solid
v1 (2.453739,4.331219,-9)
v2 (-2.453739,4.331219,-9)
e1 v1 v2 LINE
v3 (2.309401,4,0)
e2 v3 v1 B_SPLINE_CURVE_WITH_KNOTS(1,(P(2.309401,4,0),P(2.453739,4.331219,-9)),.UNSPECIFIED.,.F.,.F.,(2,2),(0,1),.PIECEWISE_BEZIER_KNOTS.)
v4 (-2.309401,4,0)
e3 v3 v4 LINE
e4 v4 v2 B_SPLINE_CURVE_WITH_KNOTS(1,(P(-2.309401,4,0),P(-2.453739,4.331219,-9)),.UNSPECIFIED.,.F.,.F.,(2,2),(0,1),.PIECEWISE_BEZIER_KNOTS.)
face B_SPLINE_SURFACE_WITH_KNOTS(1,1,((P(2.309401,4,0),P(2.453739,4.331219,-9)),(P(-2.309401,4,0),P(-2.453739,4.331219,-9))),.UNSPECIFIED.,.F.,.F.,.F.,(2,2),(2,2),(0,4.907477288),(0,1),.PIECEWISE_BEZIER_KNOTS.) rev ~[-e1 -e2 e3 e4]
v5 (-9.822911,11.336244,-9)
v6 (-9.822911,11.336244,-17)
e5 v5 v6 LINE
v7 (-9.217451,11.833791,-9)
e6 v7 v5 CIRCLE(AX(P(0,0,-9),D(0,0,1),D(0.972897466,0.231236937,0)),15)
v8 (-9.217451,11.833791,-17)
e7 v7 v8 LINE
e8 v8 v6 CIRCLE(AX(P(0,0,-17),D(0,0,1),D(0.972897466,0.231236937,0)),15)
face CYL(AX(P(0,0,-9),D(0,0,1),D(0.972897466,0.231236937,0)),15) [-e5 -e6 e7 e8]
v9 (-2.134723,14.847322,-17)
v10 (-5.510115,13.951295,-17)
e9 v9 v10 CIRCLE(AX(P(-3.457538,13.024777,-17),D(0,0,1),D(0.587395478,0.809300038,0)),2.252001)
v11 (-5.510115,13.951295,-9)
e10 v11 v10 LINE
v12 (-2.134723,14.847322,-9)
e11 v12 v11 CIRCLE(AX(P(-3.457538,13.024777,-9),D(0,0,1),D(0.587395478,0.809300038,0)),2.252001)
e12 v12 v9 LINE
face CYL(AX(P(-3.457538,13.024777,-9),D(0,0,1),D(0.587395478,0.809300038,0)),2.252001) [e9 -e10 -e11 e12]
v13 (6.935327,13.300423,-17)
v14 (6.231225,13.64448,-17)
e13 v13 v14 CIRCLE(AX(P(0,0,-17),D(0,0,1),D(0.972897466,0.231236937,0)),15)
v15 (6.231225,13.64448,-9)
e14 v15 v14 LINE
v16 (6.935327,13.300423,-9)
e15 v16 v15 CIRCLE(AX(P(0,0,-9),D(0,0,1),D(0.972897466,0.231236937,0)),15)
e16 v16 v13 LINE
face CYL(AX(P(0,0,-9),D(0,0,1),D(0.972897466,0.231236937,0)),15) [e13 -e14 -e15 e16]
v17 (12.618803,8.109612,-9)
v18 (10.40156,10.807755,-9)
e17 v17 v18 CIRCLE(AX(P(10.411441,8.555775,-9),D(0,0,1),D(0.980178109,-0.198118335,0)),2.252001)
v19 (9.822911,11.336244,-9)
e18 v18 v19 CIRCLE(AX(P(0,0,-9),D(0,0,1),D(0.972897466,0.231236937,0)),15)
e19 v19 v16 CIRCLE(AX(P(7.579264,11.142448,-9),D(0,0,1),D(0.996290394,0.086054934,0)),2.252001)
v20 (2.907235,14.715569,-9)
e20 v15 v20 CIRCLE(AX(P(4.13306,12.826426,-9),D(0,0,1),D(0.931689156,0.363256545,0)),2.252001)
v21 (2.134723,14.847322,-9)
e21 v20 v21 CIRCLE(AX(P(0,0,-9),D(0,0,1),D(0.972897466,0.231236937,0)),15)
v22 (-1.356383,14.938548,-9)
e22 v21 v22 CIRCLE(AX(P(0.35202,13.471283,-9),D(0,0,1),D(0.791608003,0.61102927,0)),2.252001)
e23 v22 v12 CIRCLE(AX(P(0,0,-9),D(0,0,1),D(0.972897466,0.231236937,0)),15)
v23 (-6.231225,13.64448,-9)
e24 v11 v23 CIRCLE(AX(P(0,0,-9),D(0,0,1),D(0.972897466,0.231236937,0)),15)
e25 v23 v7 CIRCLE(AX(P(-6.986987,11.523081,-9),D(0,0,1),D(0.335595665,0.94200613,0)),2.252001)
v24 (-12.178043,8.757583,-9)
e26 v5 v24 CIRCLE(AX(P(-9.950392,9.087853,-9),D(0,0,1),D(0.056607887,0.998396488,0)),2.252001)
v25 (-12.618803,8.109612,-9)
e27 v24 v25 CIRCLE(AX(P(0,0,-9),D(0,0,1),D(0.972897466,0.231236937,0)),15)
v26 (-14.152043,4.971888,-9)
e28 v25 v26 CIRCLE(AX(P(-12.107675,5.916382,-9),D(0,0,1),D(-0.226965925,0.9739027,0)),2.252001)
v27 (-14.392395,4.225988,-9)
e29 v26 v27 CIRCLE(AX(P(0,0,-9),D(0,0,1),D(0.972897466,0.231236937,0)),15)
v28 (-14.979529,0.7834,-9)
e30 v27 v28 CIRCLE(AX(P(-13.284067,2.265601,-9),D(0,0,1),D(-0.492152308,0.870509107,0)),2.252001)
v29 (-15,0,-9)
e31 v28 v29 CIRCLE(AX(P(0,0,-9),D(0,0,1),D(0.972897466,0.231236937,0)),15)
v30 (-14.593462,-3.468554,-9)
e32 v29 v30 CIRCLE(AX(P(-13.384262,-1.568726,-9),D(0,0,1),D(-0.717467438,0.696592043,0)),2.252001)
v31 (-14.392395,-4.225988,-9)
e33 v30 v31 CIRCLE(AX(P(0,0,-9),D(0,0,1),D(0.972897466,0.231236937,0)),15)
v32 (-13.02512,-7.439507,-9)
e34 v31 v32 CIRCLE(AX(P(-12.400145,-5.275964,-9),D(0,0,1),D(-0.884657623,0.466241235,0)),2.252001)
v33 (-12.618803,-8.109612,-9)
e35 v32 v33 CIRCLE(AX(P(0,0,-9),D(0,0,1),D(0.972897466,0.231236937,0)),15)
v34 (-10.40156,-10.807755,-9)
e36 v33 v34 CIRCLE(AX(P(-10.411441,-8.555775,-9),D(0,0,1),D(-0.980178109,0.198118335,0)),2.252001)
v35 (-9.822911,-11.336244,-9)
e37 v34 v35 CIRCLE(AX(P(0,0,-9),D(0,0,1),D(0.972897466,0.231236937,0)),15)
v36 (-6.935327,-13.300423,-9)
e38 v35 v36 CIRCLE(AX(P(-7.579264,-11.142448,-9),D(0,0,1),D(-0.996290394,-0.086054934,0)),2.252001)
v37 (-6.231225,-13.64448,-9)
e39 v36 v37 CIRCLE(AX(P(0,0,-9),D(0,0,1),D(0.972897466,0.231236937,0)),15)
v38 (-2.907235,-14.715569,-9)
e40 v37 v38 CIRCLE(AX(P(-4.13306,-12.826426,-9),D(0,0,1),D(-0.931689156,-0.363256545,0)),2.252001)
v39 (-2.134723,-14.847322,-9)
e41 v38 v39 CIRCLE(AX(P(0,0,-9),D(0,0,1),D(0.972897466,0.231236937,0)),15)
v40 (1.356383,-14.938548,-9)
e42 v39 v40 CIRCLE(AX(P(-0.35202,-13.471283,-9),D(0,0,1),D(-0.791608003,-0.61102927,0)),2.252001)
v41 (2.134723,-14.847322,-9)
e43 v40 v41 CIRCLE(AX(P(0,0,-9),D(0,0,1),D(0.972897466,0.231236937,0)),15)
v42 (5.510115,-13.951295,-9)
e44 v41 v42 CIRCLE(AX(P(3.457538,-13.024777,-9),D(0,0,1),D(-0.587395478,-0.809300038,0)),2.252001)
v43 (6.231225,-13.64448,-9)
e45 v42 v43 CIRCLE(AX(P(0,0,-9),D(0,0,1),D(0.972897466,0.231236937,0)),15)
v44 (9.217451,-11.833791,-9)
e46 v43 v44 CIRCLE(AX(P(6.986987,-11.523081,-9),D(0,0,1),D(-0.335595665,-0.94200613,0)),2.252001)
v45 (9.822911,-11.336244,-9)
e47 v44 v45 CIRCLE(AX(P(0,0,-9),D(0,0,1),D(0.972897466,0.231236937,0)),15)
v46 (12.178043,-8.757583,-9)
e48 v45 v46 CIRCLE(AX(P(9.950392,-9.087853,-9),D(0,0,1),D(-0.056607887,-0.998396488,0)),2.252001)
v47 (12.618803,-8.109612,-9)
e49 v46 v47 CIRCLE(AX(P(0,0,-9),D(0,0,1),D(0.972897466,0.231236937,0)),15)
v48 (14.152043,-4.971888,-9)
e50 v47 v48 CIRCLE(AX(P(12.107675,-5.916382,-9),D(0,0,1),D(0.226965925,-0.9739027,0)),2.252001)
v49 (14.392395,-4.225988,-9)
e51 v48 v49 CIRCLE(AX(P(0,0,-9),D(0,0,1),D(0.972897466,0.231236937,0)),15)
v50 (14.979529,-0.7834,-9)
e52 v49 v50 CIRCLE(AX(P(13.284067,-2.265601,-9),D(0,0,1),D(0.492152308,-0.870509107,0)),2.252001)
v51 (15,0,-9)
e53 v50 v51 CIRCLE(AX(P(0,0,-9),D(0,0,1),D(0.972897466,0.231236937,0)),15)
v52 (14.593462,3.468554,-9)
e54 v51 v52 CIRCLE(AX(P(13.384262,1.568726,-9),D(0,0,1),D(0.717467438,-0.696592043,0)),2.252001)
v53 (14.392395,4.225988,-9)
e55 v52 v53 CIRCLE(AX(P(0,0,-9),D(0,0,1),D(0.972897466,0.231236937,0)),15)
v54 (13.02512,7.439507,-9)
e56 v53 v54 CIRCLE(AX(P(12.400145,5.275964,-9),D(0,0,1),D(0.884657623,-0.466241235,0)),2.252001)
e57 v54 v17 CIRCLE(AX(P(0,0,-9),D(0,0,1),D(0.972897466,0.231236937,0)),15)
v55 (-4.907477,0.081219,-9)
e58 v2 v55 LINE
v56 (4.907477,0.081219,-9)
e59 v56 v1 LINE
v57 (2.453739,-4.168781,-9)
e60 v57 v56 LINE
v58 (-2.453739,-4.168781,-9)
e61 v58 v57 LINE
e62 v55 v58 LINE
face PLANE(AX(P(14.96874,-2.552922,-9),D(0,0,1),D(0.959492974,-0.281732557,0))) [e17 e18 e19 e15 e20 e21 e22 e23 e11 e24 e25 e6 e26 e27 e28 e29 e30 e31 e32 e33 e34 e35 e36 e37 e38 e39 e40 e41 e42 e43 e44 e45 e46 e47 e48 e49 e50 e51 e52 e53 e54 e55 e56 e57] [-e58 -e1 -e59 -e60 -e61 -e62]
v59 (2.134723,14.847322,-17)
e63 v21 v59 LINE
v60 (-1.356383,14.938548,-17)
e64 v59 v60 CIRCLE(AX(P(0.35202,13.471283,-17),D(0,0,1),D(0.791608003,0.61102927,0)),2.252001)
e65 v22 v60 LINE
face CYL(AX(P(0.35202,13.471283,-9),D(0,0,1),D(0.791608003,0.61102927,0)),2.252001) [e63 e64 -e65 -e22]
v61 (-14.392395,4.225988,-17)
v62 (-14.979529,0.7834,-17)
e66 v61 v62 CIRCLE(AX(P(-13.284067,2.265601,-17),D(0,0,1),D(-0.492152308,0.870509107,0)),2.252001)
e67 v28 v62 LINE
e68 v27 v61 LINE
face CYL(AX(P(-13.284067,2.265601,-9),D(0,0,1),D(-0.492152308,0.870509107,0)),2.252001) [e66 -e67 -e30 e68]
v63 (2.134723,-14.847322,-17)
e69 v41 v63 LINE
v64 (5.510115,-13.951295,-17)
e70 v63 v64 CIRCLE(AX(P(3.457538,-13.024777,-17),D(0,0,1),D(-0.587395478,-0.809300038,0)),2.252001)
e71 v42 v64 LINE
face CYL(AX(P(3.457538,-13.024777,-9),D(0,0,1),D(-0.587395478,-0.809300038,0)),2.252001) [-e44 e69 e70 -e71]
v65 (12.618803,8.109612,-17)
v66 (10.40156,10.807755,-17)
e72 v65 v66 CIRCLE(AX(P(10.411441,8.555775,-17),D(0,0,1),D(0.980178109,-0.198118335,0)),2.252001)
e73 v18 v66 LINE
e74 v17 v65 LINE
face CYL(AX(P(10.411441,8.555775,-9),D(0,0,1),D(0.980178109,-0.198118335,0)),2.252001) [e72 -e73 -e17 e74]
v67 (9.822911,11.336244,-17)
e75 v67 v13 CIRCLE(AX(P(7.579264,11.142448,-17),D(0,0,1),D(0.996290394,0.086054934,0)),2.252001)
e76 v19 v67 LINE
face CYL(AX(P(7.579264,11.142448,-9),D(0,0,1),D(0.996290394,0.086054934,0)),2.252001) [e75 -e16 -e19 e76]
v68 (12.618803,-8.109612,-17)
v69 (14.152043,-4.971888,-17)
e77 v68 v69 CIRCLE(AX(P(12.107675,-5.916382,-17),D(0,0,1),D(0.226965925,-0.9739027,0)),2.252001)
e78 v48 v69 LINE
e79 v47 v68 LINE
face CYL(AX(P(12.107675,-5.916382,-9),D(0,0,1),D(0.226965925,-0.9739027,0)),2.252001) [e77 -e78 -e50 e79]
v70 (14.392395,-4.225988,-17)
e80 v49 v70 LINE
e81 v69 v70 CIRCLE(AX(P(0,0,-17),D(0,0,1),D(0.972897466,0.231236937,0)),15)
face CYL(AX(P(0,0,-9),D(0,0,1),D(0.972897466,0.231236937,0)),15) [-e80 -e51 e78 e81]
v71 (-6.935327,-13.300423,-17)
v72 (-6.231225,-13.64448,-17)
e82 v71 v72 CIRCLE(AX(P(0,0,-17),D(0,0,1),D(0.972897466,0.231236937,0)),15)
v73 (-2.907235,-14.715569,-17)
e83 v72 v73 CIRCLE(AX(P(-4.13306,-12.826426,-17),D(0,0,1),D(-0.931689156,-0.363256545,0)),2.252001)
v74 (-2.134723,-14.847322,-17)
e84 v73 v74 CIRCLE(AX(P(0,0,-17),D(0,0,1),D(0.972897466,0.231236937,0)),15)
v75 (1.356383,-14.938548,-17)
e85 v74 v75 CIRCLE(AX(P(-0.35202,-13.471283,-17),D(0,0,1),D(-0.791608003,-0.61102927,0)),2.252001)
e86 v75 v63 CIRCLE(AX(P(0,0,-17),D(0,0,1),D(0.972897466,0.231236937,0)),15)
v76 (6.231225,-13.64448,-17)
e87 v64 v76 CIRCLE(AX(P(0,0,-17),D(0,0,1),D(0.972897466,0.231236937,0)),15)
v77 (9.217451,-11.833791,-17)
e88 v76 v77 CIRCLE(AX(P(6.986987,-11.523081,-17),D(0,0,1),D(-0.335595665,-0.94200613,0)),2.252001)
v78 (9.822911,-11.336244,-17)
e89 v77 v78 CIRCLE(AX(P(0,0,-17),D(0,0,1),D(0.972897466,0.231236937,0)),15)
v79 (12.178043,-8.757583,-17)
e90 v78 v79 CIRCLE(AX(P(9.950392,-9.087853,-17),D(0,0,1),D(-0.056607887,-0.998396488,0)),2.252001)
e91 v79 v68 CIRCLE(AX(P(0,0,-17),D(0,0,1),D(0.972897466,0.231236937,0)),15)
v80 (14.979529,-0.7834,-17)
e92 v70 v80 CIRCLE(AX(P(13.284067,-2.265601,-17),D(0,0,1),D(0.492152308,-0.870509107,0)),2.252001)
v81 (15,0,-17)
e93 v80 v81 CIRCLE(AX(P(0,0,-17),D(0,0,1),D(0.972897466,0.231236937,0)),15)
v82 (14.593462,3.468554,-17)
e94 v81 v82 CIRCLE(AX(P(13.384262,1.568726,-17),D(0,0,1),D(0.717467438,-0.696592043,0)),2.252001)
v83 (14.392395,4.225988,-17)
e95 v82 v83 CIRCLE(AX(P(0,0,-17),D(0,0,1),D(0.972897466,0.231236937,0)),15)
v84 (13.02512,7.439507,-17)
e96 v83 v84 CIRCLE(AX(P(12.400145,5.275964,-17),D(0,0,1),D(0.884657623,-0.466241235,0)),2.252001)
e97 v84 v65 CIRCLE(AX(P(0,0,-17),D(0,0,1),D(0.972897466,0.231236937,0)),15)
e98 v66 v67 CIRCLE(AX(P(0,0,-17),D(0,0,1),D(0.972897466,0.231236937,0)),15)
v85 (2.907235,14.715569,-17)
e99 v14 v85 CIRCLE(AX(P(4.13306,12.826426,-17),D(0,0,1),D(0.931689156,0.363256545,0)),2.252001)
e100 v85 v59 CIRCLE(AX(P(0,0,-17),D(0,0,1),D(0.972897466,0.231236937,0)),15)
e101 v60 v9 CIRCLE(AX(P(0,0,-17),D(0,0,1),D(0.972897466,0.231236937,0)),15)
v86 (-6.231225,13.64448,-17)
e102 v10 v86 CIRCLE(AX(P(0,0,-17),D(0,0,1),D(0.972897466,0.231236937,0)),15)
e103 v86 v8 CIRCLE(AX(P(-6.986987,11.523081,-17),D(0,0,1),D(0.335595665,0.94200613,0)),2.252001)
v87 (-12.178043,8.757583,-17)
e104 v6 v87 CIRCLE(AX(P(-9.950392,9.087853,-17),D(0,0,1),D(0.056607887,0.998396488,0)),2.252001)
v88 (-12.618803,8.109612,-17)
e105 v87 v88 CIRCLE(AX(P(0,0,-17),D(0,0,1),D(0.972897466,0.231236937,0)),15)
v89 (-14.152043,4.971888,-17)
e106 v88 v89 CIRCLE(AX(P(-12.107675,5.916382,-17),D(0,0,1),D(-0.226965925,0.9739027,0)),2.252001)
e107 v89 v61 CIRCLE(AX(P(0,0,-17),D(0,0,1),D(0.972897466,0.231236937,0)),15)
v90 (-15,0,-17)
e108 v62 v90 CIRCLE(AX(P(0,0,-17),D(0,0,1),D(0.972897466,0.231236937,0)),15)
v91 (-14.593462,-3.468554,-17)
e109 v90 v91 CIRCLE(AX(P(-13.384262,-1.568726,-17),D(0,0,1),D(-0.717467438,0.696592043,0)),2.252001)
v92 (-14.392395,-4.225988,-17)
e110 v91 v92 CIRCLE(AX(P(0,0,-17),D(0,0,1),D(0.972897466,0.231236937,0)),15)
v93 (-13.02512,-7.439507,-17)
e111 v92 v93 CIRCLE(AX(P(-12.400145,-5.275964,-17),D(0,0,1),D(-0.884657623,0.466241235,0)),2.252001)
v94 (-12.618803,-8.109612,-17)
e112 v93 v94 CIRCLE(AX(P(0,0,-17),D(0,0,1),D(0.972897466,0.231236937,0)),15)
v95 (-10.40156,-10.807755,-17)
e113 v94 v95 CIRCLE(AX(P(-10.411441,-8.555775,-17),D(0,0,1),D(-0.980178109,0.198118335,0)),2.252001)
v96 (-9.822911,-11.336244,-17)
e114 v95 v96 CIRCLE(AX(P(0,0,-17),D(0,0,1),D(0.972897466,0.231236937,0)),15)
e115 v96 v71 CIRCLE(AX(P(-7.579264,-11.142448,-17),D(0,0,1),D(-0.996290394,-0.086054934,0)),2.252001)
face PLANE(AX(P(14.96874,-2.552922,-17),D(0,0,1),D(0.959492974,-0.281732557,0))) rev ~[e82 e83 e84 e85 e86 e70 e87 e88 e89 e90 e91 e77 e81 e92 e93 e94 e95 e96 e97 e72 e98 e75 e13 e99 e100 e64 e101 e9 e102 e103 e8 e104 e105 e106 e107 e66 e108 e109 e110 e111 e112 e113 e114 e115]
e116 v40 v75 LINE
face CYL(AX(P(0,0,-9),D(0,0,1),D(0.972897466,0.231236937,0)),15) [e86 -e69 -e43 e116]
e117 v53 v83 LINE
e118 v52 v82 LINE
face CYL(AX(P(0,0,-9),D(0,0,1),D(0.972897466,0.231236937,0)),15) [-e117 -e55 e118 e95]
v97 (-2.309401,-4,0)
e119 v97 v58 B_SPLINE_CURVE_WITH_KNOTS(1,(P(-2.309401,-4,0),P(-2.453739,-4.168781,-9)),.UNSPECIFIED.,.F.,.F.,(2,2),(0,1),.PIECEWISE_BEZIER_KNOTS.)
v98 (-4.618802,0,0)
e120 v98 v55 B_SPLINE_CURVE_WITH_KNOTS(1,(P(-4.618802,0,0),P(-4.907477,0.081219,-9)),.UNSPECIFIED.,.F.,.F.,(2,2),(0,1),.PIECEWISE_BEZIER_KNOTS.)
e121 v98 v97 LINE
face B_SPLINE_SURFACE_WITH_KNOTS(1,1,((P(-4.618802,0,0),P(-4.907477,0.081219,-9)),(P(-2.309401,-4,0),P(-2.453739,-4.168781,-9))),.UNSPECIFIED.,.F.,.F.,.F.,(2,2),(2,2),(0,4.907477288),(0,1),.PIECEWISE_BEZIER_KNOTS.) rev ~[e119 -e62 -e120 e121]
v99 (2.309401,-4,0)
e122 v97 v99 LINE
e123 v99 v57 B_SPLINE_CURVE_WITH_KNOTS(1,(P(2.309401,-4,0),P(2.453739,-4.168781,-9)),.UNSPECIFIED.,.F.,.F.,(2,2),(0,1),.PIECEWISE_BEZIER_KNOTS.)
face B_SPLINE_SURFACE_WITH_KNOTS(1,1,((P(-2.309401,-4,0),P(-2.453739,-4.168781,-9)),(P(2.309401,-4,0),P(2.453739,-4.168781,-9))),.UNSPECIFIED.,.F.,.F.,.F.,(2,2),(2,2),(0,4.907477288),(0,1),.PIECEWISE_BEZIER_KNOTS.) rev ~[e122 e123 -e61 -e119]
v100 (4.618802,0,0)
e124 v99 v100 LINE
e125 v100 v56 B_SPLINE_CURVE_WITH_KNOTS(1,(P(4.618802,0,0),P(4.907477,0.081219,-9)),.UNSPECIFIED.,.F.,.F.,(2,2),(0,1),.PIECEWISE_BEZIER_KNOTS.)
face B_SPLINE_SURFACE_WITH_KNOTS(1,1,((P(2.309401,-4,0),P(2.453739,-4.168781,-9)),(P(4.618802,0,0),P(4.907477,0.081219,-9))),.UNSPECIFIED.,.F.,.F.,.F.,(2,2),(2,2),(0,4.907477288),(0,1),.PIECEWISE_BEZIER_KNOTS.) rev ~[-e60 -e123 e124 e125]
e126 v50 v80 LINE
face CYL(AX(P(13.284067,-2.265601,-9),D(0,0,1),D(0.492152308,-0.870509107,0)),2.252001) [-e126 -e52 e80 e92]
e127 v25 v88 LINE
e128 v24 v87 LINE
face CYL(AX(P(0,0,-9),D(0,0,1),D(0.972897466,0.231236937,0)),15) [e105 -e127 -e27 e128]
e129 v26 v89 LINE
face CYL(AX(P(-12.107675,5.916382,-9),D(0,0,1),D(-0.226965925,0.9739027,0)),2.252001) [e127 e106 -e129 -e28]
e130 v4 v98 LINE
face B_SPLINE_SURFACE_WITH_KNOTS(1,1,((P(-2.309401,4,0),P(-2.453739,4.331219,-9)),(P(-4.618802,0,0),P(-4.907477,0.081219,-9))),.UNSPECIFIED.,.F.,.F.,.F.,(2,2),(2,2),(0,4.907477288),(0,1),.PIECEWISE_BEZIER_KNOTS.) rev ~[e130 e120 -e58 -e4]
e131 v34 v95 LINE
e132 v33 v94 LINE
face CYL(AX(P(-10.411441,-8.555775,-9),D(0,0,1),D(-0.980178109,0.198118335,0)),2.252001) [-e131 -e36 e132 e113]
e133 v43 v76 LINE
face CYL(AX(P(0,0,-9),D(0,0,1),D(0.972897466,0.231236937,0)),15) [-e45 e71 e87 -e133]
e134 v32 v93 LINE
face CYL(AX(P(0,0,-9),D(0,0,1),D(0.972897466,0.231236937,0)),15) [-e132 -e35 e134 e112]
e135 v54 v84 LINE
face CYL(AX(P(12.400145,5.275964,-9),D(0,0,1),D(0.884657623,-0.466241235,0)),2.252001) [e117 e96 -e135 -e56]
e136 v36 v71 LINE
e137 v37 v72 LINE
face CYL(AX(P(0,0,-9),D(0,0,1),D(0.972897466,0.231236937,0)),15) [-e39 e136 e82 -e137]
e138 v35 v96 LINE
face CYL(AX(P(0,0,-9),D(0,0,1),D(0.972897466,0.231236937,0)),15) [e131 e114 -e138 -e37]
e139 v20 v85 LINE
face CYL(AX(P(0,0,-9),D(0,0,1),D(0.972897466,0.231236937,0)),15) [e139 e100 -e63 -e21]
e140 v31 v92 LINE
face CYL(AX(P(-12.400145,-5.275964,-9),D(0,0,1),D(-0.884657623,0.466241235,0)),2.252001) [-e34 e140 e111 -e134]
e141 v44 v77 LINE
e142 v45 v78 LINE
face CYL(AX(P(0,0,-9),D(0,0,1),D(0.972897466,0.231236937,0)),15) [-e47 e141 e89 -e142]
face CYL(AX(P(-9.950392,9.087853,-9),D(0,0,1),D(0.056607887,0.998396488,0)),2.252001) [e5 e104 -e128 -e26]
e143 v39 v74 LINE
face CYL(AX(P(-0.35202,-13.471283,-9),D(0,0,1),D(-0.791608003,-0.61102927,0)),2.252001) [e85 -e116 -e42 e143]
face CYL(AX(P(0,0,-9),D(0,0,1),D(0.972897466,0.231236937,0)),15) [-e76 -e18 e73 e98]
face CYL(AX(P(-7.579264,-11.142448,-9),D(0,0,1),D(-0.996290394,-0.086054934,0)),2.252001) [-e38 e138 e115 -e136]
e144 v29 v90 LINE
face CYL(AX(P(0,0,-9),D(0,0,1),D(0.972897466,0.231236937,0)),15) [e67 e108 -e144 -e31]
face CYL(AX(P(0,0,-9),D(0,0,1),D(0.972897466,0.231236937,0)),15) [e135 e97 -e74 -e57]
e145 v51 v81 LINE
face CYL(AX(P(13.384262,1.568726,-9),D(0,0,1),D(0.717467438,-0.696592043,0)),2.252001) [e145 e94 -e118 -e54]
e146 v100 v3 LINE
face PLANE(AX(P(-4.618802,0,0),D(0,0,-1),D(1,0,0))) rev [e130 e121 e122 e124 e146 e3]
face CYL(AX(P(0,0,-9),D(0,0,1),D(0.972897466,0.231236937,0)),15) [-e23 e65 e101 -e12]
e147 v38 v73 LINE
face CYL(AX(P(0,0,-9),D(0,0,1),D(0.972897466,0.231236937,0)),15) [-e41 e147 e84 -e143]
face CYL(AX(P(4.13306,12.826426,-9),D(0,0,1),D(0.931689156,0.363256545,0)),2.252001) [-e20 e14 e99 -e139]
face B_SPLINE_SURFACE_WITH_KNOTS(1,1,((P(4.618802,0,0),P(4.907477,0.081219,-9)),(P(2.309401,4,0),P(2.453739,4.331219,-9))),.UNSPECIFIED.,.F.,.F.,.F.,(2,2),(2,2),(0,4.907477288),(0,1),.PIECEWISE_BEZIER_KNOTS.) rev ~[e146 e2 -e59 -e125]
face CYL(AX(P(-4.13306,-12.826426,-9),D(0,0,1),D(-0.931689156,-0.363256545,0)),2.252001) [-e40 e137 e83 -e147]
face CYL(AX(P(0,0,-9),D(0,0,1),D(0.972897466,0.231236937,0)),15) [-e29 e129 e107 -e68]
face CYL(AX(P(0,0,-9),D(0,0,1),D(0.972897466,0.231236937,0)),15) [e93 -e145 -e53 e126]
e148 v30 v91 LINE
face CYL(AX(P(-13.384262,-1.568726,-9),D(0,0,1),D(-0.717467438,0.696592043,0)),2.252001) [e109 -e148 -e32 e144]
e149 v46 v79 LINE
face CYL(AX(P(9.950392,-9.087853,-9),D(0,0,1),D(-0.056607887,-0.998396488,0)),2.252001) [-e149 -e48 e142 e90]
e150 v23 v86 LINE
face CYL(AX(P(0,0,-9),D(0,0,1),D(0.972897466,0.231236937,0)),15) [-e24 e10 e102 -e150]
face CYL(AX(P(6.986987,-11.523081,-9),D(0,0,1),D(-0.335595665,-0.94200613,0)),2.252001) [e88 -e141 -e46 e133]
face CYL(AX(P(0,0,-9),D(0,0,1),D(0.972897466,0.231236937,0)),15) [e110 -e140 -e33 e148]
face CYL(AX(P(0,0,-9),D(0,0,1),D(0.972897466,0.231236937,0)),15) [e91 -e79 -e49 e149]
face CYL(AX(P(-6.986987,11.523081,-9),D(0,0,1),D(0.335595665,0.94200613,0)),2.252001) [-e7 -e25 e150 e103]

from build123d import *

# Parameters (mm, degrees)
F3_DEPTH = 8
F4_DEPTH = 8
F5_COUNT = 22


with BuildPart() as f3:
    # F2 (on offset) → F3 (new body)
    with BuildSketch(Plane.XY.offset(-9)):
        with BuildLine():
            ThreePointArc((14.5934619862, 3.4685540585), (-14.8980188245, -1.7461486487), (15, 0))
            ThreePointArc((15, 0), (14.8980188245, 1.7461486487), (14.5934619862, 3.4685540585))
        make_face()
        Polygon((-2.4537386441, -4.1687808289), (-4.9074772881, 0.0812191711), (-2.4537386441, 4.3312191711), (2.4537386441, 4.3312191711), (4.9074772881, 0.0812191711), (2.4537386441, -4.1687808289), align=None, mode=Mode.SUBTRACT)
        Polygon((-2.4537386441, 4.3312191711), (-4.9074772881, 0.0812191711), (-2.4537386441, -4.1687808289), (2.4537386441, -4.1687808289), (4.9074772881, 0.0812191711), (2.4537386441, 4.3312191711), align=None)
    extrude(amount=-F3_DEPTH)

    # F2 (on offset) → F4 (join, through all)
    with BuildSketch(Plane.XY.offset(-9)):
        with BuildLine():
            ThreePointArc((14.5934619862, 3.4685540585), (14.8980188245, 1.7461486487), (15, 0))
            ThreePointArc((15, 0), (15.6209528999, 1.8308814158), (14.5934619862, 3.4685540585))
        make_face()
    extrude(amount=-F4_DEPTH)

    # F5: F3 ×22 about axis
    f5_axis = Axis((0, 0, -9), (0, 0, 1))


with BuildPart() as f3_1:
    add(f3.part)
    for i in range(1, F5_COUNT):
        add(f3.part.rotate(f5_axis, i * 360 / F5_COUNT))

    # F0 (on Top) → F6 section 0
    with BuildSketch(Plane.XY):
        Polygon((-4.6188021535, 0), (-2.3094010768, -4), (2.3094010768, -4), (4.6188021535, 0), (2.3094010768, 4), (-2.3094010768, 4), align=None)
    # F2 (on offset) → F6 section 1
    with BuildSketch(Plane.XY.offset(-9)):
        Polygon((-2.4537386441, 4.3312191711), (-4.9074772881, 0.0812191711), (-2.4537386441, -4.1687808289), (2.4537386441, -4.1687808289), (4.9074772881, 0.0812191711), (2.4537386441, 4.3312191711), align=None)
    loft()


solid = f3_1.part
